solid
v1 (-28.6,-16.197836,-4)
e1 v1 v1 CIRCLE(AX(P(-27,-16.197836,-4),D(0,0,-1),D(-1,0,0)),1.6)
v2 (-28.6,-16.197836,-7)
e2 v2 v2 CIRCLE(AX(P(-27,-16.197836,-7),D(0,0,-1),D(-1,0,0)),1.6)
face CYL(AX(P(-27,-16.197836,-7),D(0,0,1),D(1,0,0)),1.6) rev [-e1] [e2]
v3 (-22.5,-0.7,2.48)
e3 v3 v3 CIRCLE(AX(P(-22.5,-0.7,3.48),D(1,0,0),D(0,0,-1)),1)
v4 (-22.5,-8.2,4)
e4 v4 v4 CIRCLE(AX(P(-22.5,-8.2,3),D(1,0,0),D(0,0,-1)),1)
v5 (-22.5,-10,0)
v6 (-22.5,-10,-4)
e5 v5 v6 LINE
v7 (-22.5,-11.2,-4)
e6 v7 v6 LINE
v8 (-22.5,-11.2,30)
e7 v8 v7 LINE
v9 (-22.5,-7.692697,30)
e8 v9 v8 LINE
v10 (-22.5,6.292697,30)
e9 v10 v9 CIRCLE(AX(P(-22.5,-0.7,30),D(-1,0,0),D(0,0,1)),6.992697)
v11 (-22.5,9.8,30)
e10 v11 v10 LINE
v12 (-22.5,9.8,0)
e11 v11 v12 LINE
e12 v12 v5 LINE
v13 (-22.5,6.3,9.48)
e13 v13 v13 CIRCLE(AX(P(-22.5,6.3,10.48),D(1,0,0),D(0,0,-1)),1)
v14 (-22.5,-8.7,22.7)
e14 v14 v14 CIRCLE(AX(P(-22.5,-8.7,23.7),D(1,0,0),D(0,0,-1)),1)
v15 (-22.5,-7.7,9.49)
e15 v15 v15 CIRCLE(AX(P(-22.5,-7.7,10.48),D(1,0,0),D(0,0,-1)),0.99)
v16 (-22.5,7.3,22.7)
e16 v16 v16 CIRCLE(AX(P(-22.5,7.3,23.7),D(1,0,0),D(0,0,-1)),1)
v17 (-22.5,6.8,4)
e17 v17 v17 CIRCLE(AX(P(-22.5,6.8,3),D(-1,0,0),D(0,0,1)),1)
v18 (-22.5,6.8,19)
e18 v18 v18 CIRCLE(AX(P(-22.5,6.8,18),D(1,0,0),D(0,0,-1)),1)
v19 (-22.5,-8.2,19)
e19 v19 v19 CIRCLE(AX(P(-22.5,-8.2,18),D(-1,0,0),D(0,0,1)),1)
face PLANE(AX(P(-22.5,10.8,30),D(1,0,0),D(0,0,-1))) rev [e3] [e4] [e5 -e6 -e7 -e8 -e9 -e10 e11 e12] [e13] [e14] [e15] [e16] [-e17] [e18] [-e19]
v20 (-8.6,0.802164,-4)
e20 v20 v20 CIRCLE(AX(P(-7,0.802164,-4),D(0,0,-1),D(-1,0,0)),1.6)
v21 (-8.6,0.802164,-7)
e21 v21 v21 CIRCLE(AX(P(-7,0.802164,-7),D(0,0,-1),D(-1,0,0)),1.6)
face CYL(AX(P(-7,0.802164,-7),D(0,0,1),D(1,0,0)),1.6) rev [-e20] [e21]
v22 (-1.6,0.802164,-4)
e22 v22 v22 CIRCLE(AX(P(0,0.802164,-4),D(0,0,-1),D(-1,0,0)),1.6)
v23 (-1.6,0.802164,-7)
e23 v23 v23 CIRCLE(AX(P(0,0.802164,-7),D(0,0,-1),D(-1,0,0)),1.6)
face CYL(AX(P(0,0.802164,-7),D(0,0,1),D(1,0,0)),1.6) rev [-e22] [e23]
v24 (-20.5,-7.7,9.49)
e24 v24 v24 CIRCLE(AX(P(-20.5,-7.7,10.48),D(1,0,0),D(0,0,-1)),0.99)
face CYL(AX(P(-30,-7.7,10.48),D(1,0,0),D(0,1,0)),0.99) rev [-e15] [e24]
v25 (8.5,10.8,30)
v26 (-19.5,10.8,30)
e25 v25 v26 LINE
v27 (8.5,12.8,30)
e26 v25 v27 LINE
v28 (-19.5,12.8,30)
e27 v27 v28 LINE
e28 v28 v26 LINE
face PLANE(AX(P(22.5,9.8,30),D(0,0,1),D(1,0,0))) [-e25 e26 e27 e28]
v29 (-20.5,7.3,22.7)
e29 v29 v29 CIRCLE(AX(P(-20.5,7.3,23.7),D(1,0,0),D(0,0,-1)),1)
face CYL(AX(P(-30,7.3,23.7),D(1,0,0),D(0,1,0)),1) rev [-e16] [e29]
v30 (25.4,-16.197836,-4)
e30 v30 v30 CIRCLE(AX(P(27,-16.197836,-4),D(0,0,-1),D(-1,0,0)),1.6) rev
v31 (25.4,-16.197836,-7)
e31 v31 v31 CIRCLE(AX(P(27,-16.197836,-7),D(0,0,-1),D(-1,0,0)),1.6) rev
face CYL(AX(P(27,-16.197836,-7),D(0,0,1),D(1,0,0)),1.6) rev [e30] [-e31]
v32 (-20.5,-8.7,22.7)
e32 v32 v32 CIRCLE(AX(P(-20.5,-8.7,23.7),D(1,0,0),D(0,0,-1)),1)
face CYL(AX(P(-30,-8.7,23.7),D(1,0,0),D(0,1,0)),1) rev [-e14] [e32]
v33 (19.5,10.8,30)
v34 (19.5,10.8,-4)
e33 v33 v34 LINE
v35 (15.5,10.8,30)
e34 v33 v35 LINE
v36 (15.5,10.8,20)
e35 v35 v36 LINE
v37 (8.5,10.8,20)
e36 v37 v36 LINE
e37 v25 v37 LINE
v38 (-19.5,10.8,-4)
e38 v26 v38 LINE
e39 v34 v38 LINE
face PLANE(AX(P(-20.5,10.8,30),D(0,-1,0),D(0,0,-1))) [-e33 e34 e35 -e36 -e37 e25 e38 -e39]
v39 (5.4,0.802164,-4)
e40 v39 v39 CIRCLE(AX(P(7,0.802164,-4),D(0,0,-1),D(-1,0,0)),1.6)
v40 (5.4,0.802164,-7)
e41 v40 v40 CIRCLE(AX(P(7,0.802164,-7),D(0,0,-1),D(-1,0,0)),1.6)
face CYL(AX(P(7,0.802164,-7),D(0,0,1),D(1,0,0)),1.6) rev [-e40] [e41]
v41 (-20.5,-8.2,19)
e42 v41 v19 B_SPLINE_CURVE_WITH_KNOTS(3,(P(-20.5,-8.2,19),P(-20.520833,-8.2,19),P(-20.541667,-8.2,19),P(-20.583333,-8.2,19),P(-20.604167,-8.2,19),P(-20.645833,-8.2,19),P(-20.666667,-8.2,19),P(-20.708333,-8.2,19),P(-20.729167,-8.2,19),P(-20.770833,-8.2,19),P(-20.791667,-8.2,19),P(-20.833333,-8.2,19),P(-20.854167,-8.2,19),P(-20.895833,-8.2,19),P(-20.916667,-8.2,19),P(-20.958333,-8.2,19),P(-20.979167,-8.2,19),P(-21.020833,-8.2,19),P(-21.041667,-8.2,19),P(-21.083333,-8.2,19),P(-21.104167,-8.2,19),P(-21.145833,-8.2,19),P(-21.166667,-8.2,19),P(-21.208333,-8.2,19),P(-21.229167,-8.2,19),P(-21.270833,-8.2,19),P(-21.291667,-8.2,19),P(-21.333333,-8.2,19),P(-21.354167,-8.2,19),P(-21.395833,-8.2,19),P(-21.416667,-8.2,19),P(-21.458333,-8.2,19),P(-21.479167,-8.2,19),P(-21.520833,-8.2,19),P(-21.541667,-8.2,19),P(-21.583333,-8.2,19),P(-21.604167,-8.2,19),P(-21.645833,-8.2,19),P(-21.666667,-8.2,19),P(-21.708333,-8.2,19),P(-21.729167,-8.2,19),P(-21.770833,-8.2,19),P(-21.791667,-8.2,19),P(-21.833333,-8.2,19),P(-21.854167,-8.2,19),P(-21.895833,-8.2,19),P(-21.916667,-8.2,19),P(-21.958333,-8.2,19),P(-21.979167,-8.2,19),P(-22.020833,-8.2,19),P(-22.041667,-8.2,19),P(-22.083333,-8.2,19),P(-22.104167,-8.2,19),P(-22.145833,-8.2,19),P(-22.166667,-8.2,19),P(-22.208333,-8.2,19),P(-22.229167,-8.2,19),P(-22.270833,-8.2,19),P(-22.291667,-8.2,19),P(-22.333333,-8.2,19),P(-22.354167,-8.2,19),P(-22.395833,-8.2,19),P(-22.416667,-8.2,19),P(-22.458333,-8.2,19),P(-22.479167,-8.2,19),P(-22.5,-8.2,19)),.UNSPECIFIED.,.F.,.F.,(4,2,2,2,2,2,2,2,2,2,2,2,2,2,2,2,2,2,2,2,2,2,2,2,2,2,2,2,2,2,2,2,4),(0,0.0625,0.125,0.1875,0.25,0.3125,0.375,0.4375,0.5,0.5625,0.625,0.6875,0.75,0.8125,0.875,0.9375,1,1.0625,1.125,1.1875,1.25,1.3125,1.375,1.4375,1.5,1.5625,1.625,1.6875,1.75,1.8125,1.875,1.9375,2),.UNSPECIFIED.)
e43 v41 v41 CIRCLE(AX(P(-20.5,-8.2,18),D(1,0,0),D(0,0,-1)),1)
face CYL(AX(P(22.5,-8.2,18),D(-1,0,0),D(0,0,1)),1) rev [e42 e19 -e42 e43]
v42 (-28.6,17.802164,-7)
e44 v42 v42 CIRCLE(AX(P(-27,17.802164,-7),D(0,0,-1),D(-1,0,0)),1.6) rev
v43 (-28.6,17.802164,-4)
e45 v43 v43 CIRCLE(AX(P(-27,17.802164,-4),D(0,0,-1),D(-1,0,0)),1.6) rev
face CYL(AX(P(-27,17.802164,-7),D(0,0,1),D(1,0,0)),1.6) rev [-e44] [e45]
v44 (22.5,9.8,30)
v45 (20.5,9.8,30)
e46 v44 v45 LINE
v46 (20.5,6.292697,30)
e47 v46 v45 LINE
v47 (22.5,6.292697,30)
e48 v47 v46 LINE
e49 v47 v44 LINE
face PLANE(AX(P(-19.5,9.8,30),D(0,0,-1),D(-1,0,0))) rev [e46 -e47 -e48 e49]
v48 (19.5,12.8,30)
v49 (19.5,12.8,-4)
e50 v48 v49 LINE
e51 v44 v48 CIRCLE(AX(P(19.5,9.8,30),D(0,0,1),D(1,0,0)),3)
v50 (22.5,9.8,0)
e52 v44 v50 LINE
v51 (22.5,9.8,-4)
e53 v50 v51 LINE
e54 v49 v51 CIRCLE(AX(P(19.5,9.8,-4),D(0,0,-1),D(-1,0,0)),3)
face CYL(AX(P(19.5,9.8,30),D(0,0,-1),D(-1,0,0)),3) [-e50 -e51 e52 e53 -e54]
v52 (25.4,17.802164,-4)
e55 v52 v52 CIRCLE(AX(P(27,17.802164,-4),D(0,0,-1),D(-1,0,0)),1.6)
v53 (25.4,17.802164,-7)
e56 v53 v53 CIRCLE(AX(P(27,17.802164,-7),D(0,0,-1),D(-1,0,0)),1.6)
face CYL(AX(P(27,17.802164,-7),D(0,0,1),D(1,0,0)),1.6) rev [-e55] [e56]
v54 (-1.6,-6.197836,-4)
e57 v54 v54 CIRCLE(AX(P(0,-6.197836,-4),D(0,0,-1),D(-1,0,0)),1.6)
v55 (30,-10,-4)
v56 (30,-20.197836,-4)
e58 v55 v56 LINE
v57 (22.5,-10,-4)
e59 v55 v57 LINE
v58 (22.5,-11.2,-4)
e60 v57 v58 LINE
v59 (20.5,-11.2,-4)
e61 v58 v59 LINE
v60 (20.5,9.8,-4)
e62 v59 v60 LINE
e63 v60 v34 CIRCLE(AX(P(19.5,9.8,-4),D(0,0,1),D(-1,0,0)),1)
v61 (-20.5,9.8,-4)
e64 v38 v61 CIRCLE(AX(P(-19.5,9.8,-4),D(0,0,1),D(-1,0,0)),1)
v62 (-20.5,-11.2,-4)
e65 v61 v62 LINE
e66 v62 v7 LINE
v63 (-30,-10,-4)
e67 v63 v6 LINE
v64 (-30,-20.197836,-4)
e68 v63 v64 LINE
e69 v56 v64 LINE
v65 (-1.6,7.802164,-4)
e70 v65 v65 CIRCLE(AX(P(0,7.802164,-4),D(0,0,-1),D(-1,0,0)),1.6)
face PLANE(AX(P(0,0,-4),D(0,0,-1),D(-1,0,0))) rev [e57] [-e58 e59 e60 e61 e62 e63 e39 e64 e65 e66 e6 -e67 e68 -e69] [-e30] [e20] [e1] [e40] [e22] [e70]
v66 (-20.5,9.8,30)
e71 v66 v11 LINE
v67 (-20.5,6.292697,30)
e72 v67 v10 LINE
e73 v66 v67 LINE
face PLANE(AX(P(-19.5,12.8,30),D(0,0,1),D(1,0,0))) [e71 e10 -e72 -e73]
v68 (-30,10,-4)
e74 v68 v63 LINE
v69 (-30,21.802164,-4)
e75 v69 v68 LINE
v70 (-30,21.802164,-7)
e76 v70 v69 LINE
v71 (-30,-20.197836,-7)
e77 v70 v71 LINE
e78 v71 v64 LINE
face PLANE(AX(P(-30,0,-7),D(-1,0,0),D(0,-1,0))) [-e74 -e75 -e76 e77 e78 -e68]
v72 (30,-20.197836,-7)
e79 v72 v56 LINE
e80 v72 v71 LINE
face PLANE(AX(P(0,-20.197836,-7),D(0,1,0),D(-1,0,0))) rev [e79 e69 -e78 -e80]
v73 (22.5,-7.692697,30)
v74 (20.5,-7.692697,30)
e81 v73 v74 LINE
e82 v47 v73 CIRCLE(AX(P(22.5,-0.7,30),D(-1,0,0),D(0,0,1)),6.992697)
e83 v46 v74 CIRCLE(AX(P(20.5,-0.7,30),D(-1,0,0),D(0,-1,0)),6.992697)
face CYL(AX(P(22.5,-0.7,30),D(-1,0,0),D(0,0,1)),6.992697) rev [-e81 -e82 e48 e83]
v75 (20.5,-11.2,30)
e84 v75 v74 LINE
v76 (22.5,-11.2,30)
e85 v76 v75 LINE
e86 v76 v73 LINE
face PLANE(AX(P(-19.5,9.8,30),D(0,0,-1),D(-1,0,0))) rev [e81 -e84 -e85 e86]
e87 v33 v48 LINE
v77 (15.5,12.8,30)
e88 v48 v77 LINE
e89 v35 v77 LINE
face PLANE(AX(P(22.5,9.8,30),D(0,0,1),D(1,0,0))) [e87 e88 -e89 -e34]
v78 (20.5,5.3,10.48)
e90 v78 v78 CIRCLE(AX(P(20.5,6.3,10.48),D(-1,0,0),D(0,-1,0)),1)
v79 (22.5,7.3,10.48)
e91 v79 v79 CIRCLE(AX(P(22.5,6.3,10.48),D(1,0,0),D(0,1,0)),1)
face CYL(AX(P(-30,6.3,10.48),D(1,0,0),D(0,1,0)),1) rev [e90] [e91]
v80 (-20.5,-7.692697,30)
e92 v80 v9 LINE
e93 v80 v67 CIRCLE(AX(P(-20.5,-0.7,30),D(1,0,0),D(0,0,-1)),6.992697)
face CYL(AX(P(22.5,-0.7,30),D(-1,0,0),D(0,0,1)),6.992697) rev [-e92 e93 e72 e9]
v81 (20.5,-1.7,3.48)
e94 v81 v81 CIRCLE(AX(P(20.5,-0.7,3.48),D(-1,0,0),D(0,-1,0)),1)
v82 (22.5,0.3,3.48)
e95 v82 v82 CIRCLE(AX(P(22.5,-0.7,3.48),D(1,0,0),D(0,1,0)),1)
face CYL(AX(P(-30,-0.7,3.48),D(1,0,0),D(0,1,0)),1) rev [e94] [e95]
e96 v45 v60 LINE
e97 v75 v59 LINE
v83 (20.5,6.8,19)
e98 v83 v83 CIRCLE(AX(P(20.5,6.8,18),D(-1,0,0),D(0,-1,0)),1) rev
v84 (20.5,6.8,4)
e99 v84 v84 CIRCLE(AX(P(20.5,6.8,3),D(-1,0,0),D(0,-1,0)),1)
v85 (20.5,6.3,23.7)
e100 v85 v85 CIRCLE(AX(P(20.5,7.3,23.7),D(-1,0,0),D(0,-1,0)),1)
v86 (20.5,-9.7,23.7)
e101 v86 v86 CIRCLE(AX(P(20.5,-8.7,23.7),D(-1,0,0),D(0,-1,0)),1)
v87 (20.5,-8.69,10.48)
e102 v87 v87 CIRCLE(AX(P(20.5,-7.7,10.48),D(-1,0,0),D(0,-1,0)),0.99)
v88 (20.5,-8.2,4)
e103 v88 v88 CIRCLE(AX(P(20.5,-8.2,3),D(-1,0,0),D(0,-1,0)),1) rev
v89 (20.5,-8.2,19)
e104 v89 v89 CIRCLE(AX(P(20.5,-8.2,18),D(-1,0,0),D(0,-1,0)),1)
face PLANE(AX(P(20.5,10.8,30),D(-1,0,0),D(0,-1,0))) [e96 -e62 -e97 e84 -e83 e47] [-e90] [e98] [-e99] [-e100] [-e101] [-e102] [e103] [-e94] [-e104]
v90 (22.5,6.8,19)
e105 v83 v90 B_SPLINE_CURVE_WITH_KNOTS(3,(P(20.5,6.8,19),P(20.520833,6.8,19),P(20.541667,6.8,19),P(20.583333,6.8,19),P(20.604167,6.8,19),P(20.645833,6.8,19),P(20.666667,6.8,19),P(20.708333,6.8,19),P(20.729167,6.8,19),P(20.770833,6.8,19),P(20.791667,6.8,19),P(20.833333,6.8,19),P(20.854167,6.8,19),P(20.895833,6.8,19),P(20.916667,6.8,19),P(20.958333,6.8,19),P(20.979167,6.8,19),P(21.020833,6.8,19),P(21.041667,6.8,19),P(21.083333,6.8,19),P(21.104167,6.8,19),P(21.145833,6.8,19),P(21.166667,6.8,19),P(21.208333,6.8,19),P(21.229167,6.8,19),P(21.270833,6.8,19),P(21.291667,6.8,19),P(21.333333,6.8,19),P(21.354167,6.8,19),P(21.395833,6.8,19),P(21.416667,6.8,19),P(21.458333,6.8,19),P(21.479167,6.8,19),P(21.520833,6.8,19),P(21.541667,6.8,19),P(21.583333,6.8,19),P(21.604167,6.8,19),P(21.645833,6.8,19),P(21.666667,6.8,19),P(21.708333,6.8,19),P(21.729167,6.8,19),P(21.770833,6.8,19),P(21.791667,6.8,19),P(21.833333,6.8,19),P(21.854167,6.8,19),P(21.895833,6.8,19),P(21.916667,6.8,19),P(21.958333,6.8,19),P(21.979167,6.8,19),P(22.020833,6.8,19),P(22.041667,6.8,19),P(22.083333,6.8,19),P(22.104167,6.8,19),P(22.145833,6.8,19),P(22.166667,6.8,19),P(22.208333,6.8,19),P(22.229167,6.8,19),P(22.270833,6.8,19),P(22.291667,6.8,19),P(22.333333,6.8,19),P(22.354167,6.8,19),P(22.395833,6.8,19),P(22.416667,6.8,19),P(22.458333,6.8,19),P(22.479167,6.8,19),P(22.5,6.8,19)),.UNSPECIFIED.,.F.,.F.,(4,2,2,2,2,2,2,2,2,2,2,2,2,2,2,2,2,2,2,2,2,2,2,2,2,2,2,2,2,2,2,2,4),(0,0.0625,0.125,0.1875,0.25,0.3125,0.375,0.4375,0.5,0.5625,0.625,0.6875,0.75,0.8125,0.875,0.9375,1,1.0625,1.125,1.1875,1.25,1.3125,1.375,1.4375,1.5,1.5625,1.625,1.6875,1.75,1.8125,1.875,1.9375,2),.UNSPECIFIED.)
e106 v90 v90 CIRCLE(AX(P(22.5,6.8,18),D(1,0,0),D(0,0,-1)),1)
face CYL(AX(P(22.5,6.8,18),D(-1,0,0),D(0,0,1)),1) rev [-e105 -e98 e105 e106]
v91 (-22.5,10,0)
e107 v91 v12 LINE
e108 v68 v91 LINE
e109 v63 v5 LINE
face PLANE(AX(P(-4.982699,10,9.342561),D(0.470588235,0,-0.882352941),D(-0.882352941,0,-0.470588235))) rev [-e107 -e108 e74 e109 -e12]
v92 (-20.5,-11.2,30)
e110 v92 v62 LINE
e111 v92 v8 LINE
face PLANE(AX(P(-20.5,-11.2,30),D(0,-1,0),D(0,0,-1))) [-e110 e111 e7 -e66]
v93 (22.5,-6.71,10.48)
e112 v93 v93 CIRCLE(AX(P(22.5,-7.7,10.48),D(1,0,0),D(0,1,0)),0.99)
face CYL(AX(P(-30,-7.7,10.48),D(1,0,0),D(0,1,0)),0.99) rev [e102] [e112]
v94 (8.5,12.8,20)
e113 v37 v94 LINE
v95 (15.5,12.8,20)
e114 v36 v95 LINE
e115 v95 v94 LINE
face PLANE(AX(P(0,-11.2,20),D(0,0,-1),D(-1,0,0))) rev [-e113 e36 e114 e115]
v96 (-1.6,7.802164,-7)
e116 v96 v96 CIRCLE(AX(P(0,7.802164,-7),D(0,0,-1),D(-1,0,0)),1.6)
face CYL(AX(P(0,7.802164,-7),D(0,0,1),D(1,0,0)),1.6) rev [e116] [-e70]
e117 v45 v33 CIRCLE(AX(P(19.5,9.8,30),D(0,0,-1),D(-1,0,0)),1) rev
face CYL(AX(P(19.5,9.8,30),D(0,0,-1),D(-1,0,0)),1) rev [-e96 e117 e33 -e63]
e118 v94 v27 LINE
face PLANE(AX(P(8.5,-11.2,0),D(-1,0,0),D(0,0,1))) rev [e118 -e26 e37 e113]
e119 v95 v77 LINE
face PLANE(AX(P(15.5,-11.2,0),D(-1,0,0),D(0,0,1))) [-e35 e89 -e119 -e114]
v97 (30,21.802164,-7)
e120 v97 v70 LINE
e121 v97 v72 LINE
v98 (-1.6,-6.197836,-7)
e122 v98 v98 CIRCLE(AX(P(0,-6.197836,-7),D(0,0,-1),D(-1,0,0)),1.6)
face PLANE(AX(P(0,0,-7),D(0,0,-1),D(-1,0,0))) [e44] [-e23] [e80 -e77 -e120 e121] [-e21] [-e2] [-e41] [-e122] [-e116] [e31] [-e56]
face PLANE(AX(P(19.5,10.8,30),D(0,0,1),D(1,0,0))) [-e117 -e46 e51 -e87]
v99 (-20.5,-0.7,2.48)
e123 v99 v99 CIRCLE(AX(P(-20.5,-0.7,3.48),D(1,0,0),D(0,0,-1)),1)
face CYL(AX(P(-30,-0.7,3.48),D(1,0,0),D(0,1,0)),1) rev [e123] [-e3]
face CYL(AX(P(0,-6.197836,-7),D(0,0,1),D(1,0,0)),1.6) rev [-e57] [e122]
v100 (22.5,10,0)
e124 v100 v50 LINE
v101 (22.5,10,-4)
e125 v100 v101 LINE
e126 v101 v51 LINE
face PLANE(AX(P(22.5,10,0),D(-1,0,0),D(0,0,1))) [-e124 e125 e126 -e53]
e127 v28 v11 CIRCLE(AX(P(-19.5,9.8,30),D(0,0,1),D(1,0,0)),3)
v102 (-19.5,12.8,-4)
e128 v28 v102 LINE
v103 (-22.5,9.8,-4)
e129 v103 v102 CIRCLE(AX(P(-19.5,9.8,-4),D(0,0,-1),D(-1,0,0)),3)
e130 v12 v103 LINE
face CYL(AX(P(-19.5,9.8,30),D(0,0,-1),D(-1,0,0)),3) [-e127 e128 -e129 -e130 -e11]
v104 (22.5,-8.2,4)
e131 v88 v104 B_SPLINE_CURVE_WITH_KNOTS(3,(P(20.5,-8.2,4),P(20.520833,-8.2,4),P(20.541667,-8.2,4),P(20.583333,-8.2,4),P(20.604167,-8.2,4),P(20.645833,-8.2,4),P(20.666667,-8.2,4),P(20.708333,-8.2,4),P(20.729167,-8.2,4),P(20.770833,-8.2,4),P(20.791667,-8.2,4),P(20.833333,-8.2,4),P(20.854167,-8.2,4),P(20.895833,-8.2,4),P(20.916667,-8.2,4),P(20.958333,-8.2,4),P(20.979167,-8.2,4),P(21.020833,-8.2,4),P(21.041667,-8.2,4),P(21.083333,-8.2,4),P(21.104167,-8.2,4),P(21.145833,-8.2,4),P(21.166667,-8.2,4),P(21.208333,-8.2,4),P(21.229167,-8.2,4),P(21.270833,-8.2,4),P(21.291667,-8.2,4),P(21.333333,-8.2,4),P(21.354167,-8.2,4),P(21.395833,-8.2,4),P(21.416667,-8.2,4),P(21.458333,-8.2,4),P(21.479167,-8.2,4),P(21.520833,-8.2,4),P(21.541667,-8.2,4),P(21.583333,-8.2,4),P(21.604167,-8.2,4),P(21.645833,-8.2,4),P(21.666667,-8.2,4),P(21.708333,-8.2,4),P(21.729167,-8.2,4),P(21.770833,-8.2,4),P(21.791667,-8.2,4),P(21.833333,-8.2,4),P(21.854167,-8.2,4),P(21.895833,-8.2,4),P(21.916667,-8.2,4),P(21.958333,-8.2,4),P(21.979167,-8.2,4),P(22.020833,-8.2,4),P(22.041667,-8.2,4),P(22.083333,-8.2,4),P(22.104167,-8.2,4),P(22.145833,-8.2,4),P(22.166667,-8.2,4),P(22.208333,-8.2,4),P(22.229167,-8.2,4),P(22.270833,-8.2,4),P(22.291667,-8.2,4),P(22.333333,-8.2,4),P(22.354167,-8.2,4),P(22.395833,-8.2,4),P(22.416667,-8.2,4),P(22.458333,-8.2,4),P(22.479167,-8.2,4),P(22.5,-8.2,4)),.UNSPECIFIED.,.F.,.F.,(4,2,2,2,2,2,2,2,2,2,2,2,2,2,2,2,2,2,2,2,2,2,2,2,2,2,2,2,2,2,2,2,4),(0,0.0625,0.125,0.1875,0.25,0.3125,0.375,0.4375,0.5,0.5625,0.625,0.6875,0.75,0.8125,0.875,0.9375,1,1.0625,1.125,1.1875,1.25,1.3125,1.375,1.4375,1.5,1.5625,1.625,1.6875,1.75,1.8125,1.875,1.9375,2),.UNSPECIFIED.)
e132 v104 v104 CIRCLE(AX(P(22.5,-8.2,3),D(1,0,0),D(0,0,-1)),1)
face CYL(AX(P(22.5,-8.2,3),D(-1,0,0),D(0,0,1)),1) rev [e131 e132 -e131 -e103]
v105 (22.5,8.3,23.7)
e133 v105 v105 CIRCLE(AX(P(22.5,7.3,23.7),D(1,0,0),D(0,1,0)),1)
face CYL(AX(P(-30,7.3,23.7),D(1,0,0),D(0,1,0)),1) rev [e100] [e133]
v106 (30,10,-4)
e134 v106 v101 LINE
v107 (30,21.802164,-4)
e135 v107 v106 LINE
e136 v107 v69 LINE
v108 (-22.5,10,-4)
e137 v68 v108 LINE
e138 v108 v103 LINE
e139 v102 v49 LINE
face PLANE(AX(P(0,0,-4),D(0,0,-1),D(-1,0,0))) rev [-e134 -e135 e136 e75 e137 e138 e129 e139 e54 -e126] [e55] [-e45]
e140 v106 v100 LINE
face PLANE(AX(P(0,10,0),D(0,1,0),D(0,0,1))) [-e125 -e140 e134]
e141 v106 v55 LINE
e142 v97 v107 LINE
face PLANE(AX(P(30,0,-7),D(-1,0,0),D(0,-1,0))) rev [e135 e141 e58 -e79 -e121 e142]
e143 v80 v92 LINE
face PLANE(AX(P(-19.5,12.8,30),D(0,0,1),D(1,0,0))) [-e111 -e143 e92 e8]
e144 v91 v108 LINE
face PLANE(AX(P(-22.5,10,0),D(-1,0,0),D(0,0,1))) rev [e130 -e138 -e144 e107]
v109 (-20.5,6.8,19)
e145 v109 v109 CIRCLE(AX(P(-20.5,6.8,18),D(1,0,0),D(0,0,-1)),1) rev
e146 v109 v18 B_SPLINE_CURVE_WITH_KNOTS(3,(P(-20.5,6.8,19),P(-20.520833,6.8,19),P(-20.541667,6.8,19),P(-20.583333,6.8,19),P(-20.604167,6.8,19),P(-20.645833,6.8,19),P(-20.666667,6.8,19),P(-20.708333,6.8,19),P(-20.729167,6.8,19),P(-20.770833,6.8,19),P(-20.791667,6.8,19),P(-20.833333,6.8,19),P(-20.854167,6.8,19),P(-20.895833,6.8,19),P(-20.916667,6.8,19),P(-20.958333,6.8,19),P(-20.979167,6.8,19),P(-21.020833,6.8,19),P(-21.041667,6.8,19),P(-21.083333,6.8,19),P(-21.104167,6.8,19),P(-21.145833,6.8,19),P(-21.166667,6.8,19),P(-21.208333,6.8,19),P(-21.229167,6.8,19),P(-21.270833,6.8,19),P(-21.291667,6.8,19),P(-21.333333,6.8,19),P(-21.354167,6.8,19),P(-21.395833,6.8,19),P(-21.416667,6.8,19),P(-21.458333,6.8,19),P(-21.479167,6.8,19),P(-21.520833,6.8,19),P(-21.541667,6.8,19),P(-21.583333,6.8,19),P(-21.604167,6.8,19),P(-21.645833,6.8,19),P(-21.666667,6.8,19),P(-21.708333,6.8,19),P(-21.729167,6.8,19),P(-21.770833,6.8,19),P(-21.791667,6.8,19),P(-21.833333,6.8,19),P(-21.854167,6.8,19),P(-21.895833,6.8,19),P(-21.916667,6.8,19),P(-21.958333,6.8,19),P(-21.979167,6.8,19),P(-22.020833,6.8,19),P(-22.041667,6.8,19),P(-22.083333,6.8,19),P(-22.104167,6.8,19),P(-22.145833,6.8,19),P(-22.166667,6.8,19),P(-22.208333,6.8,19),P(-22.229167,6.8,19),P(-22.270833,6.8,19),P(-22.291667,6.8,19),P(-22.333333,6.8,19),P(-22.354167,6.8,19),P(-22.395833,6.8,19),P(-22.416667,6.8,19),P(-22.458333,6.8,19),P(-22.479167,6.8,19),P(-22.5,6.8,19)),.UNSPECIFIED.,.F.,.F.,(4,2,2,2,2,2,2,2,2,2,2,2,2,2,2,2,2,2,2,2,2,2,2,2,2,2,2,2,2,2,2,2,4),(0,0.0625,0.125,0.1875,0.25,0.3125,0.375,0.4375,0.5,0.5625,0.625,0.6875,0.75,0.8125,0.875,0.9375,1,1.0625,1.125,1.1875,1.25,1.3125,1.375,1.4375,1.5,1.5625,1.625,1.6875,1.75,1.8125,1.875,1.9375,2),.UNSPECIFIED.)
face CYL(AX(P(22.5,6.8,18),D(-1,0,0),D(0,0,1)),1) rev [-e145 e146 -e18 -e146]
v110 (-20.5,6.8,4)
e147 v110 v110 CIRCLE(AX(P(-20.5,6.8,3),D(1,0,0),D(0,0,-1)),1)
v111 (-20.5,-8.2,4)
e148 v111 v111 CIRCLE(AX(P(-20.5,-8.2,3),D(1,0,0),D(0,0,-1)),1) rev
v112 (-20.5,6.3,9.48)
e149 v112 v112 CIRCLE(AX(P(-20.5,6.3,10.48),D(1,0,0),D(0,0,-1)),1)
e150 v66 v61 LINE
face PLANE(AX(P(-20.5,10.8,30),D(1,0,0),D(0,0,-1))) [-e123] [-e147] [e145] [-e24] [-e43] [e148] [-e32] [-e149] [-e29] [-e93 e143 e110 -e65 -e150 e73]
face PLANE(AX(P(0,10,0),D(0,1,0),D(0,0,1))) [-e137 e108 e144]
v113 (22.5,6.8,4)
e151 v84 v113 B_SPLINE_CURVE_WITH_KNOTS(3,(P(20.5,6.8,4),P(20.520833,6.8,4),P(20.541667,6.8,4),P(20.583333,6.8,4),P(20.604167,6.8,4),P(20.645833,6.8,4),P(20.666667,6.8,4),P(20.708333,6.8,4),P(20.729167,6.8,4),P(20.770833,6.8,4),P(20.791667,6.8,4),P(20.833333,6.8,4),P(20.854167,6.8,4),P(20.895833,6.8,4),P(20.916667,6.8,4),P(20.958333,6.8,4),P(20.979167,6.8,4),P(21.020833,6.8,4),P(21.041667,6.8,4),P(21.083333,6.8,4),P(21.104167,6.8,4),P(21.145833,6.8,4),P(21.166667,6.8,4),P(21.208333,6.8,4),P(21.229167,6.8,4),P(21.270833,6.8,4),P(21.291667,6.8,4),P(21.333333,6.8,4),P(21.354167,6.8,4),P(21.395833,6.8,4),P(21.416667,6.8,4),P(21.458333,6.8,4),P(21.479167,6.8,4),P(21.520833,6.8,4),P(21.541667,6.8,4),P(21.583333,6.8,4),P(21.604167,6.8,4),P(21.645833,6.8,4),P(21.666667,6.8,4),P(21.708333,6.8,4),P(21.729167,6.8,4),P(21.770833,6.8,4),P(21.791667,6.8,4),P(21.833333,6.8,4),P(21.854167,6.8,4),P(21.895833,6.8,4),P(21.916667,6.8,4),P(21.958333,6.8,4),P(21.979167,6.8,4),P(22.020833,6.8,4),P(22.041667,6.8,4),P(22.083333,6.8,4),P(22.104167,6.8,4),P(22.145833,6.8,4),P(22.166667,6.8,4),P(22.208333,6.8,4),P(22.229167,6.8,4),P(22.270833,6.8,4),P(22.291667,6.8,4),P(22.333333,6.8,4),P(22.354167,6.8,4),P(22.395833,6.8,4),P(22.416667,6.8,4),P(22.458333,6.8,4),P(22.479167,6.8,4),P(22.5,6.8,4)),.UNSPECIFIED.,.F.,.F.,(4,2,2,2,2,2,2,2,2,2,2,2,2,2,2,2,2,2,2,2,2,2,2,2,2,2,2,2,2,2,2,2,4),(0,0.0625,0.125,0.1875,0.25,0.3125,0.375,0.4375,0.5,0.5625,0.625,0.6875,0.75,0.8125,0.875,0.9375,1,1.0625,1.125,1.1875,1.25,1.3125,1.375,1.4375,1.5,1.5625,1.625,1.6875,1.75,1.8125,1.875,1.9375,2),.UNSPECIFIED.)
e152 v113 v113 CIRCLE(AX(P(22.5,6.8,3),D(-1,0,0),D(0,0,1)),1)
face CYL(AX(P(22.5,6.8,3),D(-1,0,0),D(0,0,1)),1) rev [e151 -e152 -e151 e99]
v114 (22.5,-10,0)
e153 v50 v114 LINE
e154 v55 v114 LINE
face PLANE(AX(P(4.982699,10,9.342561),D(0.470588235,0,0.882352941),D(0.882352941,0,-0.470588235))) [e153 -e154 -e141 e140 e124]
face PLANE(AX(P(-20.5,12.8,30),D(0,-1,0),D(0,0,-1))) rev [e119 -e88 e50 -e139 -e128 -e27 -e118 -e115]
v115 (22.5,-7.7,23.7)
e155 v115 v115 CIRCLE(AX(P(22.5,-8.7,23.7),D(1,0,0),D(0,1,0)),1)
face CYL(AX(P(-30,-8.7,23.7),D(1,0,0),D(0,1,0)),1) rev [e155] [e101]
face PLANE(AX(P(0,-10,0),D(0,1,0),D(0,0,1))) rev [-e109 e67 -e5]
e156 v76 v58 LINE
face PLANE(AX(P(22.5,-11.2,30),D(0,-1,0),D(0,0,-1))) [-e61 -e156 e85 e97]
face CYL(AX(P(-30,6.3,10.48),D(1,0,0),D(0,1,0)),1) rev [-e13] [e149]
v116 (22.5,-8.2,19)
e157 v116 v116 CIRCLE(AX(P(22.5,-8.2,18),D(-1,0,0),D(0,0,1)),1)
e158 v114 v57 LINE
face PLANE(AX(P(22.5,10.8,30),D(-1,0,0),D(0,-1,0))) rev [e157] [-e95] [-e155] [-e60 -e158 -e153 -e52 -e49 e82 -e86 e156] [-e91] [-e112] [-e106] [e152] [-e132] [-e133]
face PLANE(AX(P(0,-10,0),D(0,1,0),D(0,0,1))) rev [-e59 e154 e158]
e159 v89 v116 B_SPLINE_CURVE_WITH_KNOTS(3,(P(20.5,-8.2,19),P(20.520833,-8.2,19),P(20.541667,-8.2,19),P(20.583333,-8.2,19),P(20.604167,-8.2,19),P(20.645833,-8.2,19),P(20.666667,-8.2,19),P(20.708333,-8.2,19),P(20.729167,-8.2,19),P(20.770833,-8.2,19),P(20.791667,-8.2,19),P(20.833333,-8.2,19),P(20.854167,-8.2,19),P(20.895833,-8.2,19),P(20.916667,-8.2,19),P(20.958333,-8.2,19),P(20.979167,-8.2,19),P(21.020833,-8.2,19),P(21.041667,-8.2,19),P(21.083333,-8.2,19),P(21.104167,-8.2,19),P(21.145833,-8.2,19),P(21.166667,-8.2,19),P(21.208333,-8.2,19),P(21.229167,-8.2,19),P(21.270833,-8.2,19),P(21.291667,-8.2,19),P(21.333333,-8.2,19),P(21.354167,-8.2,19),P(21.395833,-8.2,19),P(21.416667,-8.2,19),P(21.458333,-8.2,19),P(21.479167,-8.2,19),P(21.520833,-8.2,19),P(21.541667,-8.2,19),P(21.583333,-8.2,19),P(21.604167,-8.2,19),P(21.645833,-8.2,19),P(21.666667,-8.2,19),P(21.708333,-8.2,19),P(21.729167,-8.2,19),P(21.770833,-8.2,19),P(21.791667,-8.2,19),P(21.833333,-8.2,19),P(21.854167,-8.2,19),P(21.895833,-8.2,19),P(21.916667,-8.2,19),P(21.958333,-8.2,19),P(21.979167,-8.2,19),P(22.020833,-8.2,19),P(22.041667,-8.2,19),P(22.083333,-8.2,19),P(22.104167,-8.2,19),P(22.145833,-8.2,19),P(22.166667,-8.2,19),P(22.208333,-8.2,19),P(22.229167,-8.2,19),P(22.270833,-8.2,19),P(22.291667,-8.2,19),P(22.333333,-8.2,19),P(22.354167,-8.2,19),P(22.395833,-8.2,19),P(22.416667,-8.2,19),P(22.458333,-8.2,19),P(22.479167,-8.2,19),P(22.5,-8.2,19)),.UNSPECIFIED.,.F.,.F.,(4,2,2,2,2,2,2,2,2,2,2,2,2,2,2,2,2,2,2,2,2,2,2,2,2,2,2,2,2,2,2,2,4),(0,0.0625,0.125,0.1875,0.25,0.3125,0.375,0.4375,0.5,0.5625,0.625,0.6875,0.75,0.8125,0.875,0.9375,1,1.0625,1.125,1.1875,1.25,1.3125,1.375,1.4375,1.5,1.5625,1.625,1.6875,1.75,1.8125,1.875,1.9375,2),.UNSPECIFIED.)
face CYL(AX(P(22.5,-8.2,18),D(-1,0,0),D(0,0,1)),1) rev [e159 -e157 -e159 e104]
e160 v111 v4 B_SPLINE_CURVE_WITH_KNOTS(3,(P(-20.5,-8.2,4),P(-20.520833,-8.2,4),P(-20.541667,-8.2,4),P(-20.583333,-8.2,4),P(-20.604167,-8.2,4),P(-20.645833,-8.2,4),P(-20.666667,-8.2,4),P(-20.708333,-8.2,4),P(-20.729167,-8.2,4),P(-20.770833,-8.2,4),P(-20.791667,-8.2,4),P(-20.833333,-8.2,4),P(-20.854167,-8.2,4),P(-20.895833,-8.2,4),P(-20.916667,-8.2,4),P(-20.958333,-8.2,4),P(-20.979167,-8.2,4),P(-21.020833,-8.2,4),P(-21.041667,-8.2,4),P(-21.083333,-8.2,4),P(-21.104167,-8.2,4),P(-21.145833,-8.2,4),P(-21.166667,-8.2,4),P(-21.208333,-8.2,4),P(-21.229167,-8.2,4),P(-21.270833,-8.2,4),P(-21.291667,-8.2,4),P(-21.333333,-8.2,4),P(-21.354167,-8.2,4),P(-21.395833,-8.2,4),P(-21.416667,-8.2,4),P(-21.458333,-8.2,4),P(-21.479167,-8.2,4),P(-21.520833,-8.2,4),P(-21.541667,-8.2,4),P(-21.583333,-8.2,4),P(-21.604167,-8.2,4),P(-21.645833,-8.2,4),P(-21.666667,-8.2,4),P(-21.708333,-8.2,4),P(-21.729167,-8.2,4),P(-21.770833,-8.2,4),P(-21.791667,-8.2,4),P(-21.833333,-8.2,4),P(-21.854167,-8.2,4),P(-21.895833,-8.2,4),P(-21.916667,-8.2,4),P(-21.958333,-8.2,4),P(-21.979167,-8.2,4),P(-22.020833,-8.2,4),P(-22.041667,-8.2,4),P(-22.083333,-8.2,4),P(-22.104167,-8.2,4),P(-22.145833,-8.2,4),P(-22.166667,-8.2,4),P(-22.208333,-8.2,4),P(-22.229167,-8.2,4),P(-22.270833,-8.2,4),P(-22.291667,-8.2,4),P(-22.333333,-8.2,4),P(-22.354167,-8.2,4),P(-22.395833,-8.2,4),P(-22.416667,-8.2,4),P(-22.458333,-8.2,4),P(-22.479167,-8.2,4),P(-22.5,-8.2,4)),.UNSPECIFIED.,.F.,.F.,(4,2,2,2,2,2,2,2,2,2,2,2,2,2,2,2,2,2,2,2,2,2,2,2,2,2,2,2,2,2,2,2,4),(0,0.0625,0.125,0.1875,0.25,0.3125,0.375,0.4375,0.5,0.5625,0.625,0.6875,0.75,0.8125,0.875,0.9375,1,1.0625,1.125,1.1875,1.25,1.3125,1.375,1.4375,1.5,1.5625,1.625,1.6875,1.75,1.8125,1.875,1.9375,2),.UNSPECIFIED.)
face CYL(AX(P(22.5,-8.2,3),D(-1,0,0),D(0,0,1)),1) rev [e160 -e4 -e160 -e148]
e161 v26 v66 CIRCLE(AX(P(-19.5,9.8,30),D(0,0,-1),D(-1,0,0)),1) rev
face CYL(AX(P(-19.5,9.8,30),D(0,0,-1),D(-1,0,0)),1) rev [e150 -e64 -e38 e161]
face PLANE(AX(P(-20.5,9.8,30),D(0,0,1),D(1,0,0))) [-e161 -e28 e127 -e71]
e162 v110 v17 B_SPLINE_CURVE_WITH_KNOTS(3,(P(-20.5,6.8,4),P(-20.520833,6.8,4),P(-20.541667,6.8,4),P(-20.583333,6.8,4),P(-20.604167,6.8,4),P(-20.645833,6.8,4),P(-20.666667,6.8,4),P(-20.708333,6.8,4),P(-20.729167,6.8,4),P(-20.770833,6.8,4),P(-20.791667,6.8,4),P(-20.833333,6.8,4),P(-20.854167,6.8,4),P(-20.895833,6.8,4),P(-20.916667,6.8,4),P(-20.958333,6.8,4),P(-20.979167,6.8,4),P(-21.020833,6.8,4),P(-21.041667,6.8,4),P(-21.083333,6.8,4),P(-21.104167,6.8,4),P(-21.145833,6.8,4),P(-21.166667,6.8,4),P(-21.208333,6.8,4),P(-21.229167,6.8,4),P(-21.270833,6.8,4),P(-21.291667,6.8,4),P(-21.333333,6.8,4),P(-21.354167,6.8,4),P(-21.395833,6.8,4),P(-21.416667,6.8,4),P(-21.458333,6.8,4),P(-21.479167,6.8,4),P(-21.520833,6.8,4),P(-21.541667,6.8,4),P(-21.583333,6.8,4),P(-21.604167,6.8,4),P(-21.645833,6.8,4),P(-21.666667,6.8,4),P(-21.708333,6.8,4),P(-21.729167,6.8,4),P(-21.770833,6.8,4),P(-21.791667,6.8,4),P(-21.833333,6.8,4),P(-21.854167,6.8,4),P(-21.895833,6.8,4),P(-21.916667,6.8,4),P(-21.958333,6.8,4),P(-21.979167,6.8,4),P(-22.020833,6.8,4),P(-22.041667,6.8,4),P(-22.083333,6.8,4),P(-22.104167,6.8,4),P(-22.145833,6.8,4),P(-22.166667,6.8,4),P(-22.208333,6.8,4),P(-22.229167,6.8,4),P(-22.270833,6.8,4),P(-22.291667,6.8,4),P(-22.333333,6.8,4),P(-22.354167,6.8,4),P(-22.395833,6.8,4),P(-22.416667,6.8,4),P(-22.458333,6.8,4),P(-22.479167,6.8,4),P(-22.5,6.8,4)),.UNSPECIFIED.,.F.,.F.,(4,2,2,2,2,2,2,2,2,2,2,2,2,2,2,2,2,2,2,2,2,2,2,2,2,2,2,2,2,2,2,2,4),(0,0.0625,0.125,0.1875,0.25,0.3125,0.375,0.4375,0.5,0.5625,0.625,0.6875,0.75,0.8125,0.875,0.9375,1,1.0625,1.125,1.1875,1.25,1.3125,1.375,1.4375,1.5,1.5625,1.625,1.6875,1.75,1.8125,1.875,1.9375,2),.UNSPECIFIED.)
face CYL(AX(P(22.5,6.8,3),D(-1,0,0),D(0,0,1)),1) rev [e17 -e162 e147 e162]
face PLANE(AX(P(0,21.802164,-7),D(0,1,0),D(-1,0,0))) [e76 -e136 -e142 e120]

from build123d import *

# Parameters (mm, degrees)
SM_BASE_FLANGE_1_DEPTH = 30
SKETCH_6_R             = 1
CUT_EXTRUDE_1_DEPTH    = 56.577333509
SKETCH_7_W             = 7
SKETCH_7_H             = 10
CUT_EXTRUDE_2_DEPTH    = 45.522466239
EXTRUDE_START          = 4
EXTRUDE_1_DEPTH        = 4
SKETCH_9_W             = 60
SKETCH_9_H             = 42
SKETCH_9_R             = 1.6
EXTRUDE_2_DEPTH        = 3
SKETCH_13_R            = 1
SKETCH_13_R_2          = 0.99
CUT_EXTRUDE_6_DEPTH    = 65.277401573
EXTRUDE_4_DEPTH        = 10


# Read off the part's stored shape, not the designer's step: 基体-法兰1
with BuildPart() as part:
    # 基体-法兰1 outline → 基体-法兰1 (new body)
    with BuildSketch(Plane.XY):
        with BuildLine():
            Line((-22.5, 9.8), (-22.5, -11.2))
            Line((-22.5, -11.2), (-20.5, -11.2))
            Line((-20.5, -11.2), (-20.5, 9.8))
            ThreePointArc((-20.5, 9.8), (-20.207106781, 10.507106781), (-19.5, 10.8))
            Line((-19.5, 10.8), (19.5, 10.8))
            ThreePointArc((19.5, 10.8), (20.207106781, 10.507106781), (20.5, 9.8))
            Line((20.5, 9.8), (20.5, -11.2))
            Line((20.5, -11.2), (22.5, -11.2))
            Line((22.5, -11.2), (22.5, 9.8))
            ThreePointArc((22.5, 9.8), (21.621320344, 11.921320344), (19.5, 12.8))
            Line((19.5, 12.8), (-19.5, 12.8))
            ThreePointArc((-19.5, 12.8), (-21.621320344, 11.921320344), (-22.5, 9.8))
        make_face()
    extrude(amount=SM_BASE_FLANGE_1_DEPTH)

    # 草图6 → 切除-拉伸1 (cut, through all)
    with BuildSketch(Plane.ZY.offset(22.5)):
        with BuildLine():
            Line((30, -7.692697161), (30, 6.292697161))
            ThreePointArc((30, 6.292697161), (23.007302839, -0.7), (30, -7.692697161))
        make_face()
        with Locations((3, 6.8)):
            Circle(SKETCH_6_R)
        with Locations((18, 6.8)):
            Circle(SKETCH_6_R)
        with Locations((18, -8.2)):
            Circle(SKETCH_6_R)
        with Locations((3, -8.2)):
            Circle(SKETCH_6_R)
    extrude(amount=-CUT_EXTRUDE_1_DEPTH, mode=Mode.SUBTRACT)

    # 草图7 → 切除-拉伸2 (cut, through all)
    with BuildSketch(Plane(origin=(0, 12.8, 0), x_dir=(1, 0, 0), z_dir=(0, 1, 0))):
        with Locations((12, -25)):
            Rectangle(SKETCH_7_W, SKETCH_7_H)
    extrude(amount=-CUT_EXTRUDE_2_DEPTH, mode=Mode.SUBTRACT)

    # 草图8 → 凸台-拉伸1 (add)
    with BuildSketch(Plane(origin=(0, 0, 0), x_dir=(-1, 0, 0), z_dir=(0, 0, -1)).offset(EXTRUDE_START)):
        with BuildLine():
            Line((-20.5, -11.2), (-20.5, 9.8))
            ThreePointArc((-20.5, 9.8), (-20.207106781, 10.507106781), (-19.5, 10.8))
            Line((-19.5, 10.8), (19.5, 10.8))
            ThreePointArc((19.5, 10.8), (20.207106781, 10.507106781), (20.5, 9.8))
            Line((20.5, 9.8), (20.5, -11.2))
            Line((20.5, -11.2), (22.5, -11.2))
            Line((22.5, -11.2), (22.5, 9.8))
            ThreePointArc((22.5, 9.8), (21.621320344, 11.921320344), (19.5, 12.8))
            Line((19.5, 12.8), (-19.5, 12.8))
            ThreePointArc((-19.5, 12.8), (-21.621320344, 11.921320344), (-22.5, 9.8))
            Line((-22.5, 9.8), (-22.5, -11.2))
            Line((-22.5, -11.2), (-20.5, -11.2))
        make_face()
    extrude(amount=-EXTRUDE_1_DEPTH)

    # 草图9 → 凸台-拉伸2 (add)
    with BuildSketch(Plane(origin=(0, 0, -4), x_dir=(-1, 0, 0), z_dir=(0, 0, -1))):
        with Locations((0, 0.802163953)):
            Rectangle(SKETCH_9_W, SKETCH_9_H)
        with Locations((-27, 17.802163953)):
            Circle(SKETCH_9_R, mode=Mode.SUBTRACT)
        with Locations((27, 17.802163953)):
            Circle(SKETCH_9_R, mode=Mode.SUBTRACT)
        with Locations((27, -16.197836047)):
            Circle(SKETCH_9_R, mode=Mode.SUBTRACT)
        with Locations((-27, -16.197836047)):
            Circle(SKETCH_9_R, mode=Mode.SUBTRACT)
        with Locations((0, 7.802163953)):
            Circle(SKETCH_9_R, mode=Mode.SUBTRACT)
        with Locations((7, 0.802163953)):
            Circle(SKETCH_9_R, mode=Mode.SUBTRACT)
        with Locations((0, -6.197836047)):
            Circle(SKETCH_9_R, mode=Mode.SUBTRACT)
        with Locations((-7, 0.802163953)):
            Circle(SKETCH_9_R, mode=Mode.SUBTRACT)
        with Locations((0, 0.802163953)):
            Circle(SKETCH_9_R, mode=Mode.SUBTRACT)
    extrude(amount=EXTRUDE_2_DEPTH)

    # 草图13 → 切除-拉伸6 (cut, through all)
    with BuildSketch(Plane(origin=(22.5, 0, 0), x_dir=(0, 0, -1), z_dir=(1, 0, 0))):
        with Locations(Location((-23.7, 7.3, 0), (0, 0, 90))):
            Circle(SKETCH_13_R)
        with Locations(Location((-10.48, 6.3, 0), (0, 0, 90))):
            Circle(SKETCH_13_R)
        with Locations(Location((-3.48, -0.7, 0), (0, 0, 90))):
            Circle(SKETCH_13_R)
        with Locations(Location((-23.7, -8.7, 0), (0, 0, 90))):
            Circle(SKETCH_13_R)
        with Locations(Location((-10.48, -7.7, 0), (0, 0, 90))):
            Circle(SKETCH_13_R_2)
    extrude(amount=-CUT_EXTRUDE_6_DEPTH, mode=Mode.SUBTRACT)

    # 草图17 → 凸台-拉伸4 (add, symmetric)
    with BuildSketch(Plane(origin=(0, 0, 0), x_dir=(1, 0, 0), z_dir=(0, 1, 0))):
        Polygon((-30, 4), (-22.5, 0), (-22.5, 4), align=None)
        Polygon((22.5, 0), (22.5, 4), (30, 4), align=None)
    extrude(amount=EXTRUDE_4_DEPTH, both=True)


solid = part.part
